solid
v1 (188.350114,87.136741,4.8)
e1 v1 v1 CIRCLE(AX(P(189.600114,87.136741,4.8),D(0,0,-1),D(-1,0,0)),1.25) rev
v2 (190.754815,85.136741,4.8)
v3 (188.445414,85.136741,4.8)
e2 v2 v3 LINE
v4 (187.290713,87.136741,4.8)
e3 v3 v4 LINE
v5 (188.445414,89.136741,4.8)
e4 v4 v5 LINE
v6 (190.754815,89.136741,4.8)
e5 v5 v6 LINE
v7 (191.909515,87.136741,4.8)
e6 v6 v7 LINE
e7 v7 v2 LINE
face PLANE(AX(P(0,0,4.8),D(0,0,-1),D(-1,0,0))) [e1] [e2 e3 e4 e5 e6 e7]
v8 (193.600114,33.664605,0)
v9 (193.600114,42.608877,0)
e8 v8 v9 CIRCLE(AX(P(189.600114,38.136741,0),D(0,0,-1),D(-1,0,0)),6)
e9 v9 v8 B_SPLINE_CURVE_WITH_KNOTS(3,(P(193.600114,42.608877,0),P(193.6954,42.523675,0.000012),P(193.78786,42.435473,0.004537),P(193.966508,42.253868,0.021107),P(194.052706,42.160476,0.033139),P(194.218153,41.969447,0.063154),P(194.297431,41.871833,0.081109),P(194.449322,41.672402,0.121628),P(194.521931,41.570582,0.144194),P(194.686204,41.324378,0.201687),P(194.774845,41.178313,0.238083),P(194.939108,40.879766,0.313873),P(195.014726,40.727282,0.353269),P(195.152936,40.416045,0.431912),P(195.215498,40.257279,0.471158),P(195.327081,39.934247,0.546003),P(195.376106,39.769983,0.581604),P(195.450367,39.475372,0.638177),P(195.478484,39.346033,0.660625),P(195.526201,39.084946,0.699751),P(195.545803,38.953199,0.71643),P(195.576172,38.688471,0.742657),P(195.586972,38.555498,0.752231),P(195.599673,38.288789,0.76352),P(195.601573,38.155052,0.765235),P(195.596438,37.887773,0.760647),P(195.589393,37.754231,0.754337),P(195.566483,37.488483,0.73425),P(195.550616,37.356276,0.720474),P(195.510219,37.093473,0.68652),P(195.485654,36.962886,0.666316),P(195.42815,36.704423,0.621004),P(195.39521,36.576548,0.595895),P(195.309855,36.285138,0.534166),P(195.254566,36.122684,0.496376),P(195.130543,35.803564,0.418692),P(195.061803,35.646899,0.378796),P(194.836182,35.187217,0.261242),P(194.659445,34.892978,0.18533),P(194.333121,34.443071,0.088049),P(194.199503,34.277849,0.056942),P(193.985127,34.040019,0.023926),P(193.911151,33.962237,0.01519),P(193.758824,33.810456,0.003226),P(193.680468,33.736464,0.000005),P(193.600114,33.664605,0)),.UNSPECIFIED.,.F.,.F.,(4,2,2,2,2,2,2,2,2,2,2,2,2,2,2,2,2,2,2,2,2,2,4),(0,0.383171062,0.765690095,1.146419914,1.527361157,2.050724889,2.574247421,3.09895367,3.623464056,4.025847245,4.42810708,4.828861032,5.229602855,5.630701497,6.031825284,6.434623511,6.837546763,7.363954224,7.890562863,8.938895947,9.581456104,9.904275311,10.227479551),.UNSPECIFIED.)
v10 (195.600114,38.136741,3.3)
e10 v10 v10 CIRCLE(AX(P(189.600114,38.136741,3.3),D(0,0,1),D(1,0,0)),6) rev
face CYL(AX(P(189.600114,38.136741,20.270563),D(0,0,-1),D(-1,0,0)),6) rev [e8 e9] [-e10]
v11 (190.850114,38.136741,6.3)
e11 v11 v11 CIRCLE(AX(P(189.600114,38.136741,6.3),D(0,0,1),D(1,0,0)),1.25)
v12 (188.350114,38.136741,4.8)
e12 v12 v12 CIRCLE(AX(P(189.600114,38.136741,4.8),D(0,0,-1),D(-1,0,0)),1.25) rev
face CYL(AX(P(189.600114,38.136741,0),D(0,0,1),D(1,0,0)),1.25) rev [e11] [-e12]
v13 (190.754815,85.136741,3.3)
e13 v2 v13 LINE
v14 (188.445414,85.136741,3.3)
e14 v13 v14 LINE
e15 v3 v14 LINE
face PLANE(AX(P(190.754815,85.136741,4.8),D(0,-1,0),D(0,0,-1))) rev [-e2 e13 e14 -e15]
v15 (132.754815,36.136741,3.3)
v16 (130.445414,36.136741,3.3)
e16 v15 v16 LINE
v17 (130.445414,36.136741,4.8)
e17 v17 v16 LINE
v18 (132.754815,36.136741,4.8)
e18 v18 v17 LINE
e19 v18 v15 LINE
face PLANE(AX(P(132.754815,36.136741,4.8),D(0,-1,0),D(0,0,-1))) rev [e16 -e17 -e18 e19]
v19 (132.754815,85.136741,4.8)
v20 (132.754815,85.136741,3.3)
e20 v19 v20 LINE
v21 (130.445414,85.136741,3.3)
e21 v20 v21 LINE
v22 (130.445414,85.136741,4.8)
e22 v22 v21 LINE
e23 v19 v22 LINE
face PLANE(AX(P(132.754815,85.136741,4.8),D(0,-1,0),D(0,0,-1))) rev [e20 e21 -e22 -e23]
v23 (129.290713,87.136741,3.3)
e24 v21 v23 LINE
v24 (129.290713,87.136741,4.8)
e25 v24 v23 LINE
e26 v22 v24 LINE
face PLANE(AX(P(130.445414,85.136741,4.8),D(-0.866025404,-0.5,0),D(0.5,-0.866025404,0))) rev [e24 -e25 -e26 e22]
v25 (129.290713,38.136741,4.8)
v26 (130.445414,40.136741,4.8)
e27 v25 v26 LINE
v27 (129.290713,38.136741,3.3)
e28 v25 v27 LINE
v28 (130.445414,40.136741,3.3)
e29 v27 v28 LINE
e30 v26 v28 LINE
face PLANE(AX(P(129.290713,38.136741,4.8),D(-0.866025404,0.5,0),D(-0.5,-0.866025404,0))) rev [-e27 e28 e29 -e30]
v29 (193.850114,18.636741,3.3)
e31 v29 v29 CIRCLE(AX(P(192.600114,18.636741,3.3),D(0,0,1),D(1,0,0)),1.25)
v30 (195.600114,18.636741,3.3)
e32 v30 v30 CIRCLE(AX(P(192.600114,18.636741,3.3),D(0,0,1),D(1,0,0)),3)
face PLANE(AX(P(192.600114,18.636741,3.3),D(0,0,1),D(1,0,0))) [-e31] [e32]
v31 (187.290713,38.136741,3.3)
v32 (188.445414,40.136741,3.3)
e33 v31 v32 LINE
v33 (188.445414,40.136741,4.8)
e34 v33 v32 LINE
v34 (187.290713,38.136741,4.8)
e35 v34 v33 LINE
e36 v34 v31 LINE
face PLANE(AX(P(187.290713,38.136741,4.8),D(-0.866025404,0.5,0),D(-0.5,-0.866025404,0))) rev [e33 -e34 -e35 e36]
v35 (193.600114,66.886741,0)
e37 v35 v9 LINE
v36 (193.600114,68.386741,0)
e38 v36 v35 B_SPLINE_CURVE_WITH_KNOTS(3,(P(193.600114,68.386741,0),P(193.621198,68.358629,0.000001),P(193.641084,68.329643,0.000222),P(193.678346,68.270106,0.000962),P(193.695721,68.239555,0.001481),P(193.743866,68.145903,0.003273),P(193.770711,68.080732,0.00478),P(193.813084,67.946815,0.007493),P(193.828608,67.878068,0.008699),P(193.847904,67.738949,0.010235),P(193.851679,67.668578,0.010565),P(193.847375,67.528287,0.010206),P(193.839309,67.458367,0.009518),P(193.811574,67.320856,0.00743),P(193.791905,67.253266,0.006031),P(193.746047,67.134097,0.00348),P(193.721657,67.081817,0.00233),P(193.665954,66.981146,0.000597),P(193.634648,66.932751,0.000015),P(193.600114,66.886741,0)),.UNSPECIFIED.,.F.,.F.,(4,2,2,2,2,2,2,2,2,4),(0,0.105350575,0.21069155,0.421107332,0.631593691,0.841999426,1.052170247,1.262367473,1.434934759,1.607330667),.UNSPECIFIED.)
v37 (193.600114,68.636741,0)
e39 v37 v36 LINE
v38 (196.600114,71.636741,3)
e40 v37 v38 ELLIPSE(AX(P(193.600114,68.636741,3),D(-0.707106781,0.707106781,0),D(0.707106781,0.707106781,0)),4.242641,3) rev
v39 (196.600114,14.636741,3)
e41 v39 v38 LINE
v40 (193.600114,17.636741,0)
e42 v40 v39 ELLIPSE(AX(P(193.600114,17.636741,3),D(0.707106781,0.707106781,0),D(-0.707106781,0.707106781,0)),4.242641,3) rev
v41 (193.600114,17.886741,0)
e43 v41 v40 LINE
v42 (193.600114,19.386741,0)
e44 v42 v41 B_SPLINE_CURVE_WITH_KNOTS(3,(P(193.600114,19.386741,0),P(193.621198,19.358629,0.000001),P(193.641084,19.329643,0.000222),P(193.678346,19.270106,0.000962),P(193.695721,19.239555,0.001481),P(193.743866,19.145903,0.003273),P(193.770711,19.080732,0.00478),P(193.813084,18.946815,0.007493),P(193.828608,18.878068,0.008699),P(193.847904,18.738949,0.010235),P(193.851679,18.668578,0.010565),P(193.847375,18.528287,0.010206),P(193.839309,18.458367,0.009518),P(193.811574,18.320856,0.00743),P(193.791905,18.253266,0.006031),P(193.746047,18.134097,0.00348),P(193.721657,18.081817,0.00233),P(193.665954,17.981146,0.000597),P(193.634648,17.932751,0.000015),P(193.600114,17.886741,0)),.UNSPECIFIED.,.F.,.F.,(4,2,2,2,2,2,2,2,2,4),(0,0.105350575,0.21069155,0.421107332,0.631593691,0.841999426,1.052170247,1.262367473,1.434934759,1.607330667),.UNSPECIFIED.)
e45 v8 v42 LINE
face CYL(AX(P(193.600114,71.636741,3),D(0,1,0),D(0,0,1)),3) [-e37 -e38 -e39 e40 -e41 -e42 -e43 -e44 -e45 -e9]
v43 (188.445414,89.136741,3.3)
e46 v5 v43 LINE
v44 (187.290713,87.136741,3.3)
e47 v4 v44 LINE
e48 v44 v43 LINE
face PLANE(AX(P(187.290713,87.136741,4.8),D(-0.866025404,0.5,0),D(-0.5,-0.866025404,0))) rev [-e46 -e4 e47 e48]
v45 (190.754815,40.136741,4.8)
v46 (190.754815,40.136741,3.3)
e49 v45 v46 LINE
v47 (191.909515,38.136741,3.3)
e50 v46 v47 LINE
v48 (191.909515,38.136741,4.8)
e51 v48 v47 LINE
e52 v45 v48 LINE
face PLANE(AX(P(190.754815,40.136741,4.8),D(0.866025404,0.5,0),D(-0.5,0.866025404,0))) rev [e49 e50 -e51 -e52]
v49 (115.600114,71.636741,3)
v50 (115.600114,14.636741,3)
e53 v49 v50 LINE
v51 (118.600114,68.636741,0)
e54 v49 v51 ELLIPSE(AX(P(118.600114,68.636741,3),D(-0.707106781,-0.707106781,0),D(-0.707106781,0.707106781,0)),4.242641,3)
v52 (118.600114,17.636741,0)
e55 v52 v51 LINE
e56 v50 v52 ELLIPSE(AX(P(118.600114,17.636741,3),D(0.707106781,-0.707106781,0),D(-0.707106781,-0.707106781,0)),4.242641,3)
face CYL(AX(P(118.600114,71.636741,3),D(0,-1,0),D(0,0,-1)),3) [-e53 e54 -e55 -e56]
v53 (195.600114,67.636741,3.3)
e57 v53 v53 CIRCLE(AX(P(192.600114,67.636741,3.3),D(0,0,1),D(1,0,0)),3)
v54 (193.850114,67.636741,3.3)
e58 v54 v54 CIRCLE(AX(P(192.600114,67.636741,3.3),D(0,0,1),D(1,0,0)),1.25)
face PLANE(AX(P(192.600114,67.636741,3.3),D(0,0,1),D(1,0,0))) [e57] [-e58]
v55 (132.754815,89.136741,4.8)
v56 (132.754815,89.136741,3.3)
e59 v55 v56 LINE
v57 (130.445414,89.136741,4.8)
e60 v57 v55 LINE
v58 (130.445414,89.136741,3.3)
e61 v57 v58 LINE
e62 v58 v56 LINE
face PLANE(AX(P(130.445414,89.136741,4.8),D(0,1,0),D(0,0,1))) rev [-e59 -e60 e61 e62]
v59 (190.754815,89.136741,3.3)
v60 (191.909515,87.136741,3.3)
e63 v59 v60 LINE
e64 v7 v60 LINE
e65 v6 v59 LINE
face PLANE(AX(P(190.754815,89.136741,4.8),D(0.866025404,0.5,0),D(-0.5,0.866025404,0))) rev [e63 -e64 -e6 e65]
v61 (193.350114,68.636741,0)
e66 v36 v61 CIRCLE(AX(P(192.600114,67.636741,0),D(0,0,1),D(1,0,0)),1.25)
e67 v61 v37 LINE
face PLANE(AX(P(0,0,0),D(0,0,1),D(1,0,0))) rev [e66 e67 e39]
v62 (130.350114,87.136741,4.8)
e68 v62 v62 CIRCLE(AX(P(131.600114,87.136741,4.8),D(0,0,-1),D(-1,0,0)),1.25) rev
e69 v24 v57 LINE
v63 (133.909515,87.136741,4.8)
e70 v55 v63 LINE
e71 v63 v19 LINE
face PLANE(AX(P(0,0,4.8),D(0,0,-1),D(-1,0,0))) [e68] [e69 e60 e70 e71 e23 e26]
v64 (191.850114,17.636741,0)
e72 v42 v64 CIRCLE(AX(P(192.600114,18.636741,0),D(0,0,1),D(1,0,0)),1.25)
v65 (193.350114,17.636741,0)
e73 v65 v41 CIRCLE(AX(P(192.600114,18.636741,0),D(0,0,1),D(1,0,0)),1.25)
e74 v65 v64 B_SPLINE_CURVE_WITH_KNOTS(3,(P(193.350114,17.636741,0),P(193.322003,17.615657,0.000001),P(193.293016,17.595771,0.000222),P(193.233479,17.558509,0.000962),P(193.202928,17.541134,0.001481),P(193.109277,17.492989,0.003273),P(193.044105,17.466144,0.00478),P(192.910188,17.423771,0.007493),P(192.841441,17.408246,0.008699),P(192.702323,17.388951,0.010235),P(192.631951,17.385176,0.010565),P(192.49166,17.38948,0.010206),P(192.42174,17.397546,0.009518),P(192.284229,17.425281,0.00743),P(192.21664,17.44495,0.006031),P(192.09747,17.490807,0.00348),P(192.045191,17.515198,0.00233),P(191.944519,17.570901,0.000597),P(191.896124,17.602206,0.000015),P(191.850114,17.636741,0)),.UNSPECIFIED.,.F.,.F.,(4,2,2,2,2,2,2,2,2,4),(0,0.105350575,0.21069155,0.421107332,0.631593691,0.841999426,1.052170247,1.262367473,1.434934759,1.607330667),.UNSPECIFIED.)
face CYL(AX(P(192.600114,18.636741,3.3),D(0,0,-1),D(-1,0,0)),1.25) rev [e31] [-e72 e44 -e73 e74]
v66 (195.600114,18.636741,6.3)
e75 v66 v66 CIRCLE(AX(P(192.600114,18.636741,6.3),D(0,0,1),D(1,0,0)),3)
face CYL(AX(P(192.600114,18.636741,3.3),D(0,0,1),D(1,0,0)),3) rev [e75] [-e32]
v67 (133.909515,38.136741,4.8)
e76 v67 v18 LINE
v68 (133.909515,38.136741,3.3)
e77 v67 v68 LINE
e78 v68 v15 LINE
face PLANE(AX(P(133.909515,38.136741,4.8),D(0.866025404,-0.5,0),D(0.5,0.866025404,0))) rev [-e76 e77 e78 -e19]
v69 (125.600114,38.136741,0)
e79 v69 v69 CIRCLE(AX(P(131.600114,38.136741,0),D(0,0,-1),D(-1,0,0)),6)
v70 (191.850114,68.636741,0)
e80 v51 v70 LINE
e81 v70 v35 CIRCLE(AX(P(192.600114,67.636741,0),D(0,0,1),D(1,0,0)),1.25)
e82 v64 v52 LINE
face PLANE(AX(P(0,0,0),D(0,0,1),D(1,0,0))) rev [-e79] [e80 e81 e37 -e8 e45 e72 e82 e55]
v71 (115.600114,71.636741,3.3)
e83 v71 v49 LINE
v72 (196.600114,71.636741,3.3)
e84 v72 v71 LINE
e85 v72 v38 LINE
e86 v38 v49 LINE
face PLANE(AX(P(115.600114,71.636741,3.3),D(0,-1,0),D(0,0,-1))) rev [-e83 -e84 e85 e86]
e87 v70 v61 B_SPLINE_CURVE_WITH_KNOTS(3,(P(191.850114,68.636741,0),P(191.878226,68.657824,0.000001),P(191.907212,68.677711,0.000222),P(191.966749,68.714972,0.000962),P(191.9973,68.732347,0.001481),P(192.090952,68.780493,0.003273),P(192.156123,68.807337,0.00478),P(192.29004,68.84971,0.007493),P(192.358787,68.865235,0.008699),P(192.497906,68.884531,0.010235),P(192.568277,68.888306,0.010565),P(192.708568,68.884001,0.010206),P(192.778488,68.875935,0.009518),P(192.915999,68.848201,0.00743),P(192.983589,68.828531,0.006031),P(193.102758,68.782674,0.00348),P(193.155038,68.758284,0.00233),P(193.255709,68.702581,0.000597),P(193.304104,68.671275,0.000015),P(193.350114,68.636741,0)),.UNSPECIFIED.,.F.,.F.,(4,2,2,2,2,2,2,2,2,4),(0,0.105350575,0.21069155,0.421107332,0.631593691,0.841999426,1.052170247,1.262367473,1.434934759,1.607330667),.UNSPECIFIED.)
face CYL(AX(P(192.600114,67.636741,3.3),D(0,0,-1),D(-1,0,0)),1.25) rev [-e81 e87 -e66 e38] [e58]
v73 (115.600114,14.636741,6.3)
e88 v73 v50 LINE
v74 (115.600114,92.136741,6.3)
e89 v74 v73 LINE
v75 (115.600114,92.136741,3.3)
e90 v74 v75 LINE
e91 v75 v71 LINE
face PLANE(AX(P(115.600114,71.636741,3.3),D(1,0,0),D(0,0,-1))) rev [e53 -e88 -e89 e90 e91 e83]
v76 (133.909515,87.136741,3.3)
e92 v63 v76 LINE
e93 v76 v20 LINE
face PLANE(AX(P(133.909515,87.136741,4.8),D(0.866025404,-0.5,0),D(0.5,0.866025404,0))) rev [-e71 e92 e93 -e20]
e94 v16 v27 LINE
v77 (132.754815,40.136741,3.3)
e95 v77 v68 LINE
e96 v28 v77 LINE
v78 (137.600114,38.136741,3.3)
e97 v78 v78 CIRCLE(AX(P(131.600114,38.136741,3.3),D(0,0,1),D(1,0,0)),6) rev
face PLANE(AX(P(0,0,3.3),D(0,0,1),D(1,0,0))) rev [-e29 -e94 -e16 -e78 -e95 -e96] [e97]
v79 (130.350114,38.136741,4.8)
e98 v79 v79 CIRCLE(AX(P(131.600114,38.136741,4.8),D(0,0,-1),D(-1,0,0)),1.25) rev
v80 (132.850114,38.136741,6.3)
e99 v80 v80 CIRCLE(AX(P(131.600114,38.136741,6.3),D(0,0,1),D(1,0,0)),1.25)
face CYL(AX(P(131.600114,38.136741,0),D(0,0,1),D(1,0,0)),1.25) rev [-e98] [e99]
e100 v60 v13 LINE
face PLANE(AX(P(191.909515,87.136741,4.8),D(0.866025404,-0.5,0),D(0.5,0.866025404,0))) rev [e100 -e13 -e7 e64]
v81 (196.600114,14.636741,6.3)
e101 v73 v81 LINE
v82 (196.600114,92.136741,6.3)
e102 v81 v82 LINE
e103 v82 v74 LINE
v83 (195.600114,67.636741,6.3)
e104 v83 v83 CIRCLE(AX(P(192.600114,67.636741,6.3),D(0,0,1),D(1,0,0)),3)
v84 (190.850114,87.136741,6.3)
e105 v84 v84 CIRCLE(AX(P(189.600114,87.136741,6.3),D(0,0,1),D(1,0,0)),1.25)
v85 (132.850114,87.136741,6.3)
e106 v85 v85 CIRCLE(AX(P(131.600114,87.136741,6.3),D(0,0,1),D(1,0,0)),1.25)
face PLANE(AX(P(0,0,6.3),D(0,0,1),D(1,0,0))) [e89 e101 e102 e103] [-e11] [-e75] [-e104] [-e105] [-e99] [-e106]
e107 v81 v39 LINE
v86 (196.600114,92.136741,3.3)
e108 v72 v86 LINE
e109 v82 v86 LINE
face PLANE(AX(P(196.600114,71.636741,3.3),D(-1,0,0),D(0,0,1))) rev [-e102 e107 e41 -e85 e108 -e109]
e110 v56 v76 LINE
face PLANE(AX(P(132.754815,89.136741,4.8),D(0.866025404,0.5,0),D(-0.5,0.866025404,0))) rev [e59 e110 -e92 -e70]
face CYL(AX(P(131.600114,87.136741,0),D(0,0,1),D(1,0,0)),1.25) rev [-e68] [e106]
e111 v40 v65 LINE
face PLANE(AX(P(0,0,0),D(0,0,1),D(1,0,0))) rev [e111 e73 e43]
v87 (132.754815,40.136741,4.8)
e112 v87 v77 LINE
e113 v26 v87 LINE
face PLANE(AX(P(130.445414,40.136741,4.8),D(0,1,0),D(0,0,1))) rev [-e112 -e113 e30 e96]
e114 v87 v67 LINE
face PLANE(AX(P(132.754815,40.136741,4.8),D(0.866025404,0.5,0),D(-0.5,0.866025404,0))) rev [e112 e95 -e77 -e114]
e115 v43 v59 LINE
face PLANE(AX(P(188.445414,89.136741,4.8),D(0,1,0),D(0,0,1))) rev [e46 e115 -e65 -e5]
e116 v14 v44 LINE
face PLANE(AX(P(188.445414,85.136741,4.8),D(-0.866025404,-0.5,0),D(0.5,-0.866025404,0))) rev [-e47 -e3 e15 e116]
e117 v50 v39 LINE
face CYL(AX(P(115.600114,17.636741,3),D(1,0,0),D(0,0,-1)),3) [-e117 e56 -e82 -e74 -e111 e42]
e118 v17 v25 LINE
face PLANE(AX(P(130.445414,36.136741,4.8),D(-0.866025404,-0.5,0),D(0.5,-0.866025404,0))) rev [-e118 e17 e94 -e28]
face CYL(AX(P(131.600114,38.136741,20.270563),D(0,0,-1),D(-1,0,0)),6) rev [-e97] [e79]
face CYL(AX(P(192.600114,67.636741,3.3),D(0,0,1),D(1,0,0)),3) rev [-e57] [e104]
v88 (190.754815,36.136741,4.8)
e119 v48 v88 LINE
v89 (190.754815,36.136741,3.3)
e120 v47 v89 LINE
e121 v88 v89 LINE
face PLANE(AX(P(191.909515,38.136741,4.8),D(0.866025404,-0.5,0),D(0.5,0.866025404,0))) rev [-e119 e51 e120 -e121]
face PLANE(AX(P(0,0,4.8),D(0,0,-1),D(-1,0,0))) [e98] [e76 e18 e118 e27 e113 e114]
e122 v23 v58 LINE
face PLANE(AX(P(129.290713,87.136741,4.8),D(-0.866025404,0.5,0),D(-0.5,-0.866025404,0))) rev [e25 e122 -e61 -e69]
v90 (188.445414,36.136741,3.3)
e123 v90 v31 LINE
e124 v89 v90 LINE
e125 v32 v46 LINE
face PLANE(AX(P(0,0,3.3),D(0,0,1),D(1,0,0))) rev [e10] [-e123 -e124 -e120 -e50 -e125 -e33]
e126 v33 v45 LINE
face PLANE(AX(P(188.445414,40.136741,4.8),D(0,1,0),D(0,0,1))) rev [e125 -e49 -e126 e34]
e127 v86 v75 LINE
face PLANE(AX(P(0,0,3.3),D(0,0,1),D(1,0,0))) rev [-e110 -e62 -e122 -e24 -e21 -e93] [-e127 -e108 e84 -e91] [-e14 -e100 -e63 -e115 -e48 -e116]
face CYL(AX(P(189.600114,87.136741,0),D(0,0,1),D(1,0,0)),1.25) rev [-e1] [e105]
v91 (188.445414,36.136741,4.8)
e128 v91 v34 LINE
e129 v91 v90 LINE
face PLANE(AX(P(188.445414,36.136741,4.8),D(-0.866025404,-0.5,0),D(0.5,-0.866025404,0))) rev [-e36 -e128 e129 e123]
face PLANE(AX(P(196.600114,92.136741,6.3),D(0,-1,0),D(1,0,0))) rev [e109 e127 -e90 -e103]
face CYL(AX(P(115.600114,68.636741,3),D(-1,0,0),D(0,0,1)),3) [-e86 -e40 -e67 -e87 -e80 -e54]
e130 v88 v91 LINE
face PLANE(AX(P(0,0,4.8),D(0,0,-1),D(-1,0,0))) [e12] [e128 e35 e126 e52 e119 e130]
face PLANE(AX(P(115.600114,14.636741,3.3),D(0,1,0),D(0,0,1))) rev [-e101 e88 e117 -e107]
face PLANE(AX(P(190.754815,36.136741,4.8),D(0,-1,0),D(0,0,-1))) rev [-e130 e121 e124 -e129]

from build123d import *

# Parameters (mm, degrees)
SKETCH1_W           = 81
SKETCH1_H           = 57
SKETCH1_R           = 1.25
BOSS_EXTRUDE1_DEPTH = 3.3
SKETCH2_W           = 81
SKETCH2_H           = 77.5
SKETCH2_R           = 1.25
BOSS_EXTRUDE2_DEPTH = 3
CUT_EXTRUDE1_DEPTH  = 218.210667029
SKETCH4_R           = 6
CUT_EXTRUDE2_DEPTH  = 3.3
CUT_EXTRUDE3_DEPTH  = 1.5
SKETCH6_R           = 3
CUT_EXTRUDE4_DEPTH  = 3
FILLET1_R           = 3


with BuildPart() as part:
    # Sketch1 → Boss-Extrude1 (new body)
    with BuildSketch(Plane.XY):
        with Locations((156.100114143, 43.136740717)):
            Rectangle(SKETCH1_W, SKETCH1_H)
        with Locations((192.600114143, 18.636740717)):
            Circle(SKETCH1_R, mode=Mode.SUBTRACT)
        with Locations((192.600114143, 67.636740717)):
            Circle(SKETCH1_R, mode=Mode.SUBTRACT)
    extrude(amount=BOSS_EXTRUDE1_DEPTH)

    # Sketch2 → Boss-Extrude2 (add)
    with BuildSketch(Plane.XY.offset(3.3)):
        with Locations((156.100114143, 53.386740717)):
            Rectangle(SKETCH2_W, SKETCH2_H)
        with Locations((192.600114143, 67.636740717)):
            Circle(SKETCH2_R, mode=Mode.SUBTRACT)
        with Locations((192.600114143, 18.636740717)):
            Circle(SKETCH2_R, mode=Mode.SUBTRACT)
    extrude(amount=BOSS_EXTRUDE2_DEPTH)

    # Sketch3 → Cut-Extrude1 (cut, through all)
    with BuildSketch(Plane.XY.offset(6.3)):
        with BuildLine():
            Line((131.600114143, 85.886740717), (131.600114143, 87.136740717))
            Line((131.600114143, 87.136740717), (132.850114143, 87.136740717))
            ThreePointArc((132.850114143, 87.136740717), (130.716230667, 88.020624193), (131.600114143, 85.886740717))
        make_face()
        with BuildLine():
            Line((132.850114143, 87.136740717), (131.600114143, 87.136740717))
            Line((131.600114143, 87.136740717), (131.600114143, 85.886740717))
            ThreePointArc((131.600114143, 85.886740717), (132.48399762, 86.25285724), (132.850114143, 87.136740717))
        make_face()
        with BuildLine():
            ThreePointArc((190.850114143, 87.136740717), (189.600114143, 88.386740717), (188.350114143, 87.136740717))
            Line((188.350114143, 87.136740717), (189.600114143, 87.136740717))
            Line((189.600114143, 87.136740717), (189.600114143, 85.886740717))
            ThreePointArc((189.600114143, 85.886740717), (190.48399762, 86.25285724), (190.850114143, 87.136740717))
        make_face()
        with BuildLine():
            Line((189.600114143, 87.136740717), (188.350114143, 87.136740717))
            ThreePointArc((188.350114143, 87.136740717), (188.716230667, 86.25285724), (189.600114143, 85.886740717))
            Line((189.600114143, 85.886740717), (189.600114143, 87.136740717))
        make_face()
        with BuildLine():
            ThreePointArc((190.850114143, 38.136740717), (190.48399762, 39.020624193), (189.600114143, 39.386740717))
            Line((189.600114143, 39.386740717), (189.600114143, 38.136740717))
            Line((189.600114143, 38.136740717), (188.350114143, 38.136740717))
            ThreePointArc((188.350114143, 38.136740717), (189.600114143, 36.886740717), (190.850114143, 38.136740717))
        make_face()
        with BuildLine():
            Line((189.600114143, 38.136740717), (189.600114143, 39.386740717))
            ThreePointArc((189.600114143, 39.386740717), (188.716230667, 39.020624193), (188.350114143, 38.136740717))
            Line((188.350114143, 38.136740717), (189.600114143, 38.136740717))
        make_face()
        with BuildLine():
            ThreePointArc((132.850114143, 38.136740717), (132.48399762, 39.020624193), (131.600114143, 39.386740717))
            Line((131.600114143, 39.386740717), (131.600114143, 38.136740717))
            Line((131.600114143, 38.136740717), (132.850114143, 38.136740717))
        make_face()
        with BuildLine():
            Line((131.600114143, 38.136740717), (131.600114143, 39.386740717))
            ThreePointArc((131.600114143, 39.386740717), (130.716230667, 37.25285724), (132.850114143, 38.136740717))
            Line((132.850114143, 38.136740717), (131.600114143, 38.136740717))
        make_face()
    extrude(amount=-CUT_EXTRUDE1_DEPTH, mode=Mode.SUBTRACT)

    # Sketch4 → Cut-Extrude2 (cut)
    with BuildSketch(Plane(origin=(0, 0, 0), x_dir=(-1, 0, 0), z_dir=(0, 0, -1))):
        with Locations((-189.600114143, 38.136740717)):
            Circle(SKETCH4_R)
        with Locations((-131.600114143, 38.136740717)):
            Circle(SKETCH4_R)
    extrude(amount=-CUT_EXTRUDE2_DEPTH, mode=Mode.SUBTRACT)

    # Sketch5 → Cut-Extrude3 (cut)
    with BuildSketch(Plane(origin=(0, 0, 3.3), x_dir=(-1, 0, 0), z_dir=(0, 0, -1))):
        Polygon((-187.290713067, 87.136740717), (-188.445413605, 89.136740717), (-190.754814682, 89.136740717), (-191.90951522, 87.136740717), (-190.754814682, 85.136740717), (-188.445413605, 85.136740717), align=None)
        Polygon((-129.290713067, 87.136740717), (-130.445413605, 89.136740717), (-132.754814682, 89.136740717), (-133.90951522, 87.136740717), (-132.754814682, 85.136740717), (-130.445413605, 85.136740717), align=None)
        Polygon((-130.445413605, 40.136740717), (-132.754814682, 40.136740717), (-133.90951522, 38.136740717), (-132.754814682, 36.136740717), (-130.445413605, 36.136740717), (-129.290713067, 38.136740717), align=None)
        Polygon((-187.290713067, 38.136740717), (-188.445413605, 40.136740717), (-190.754814682, 40.136740717), (-191.90951522, 38.136740717), (-190.754814682, 36.136740717), (-188.445413605, 36.136740717), align=None)
    extrude(amount=-CUT_EXTRUDE3_DEPTH, mode=Mode.SUBTRACT)

    # Sketch6 → Cut-Extrude4 (cut)
    with BuildSketch(Plane.XY.offset(6.3)):
        with Locations((192.600114143, 67.636740717)):
            Circle(SKETCH6_R)
        with Locations((192.600114143, 18.636740717)):
            Circle(SKETCH6_R)
    extrude(amount=-CUT_EXTRUDE4_DEPTH, mode=Mode.SUBTRACT)

    # Fillet1
    # the kernel refuses this fillet: 3 mm, written as the material it takes off along each edge
    with BuildSketch(Plane(origin=(108.100114143, 71.636740717, 0), x_dir=(0, 0, 1), z_dir=(1, 0, 0))) as fillet1_piece_1:
        with BuildLine():
            CenterArc((FILLET1_R, FILLET1_R), FILLET1_R, 180, 90)
            Line((0, FILLET1_R), (0, 0))
            Line((0, 0), (FILLET1_R, 0))
        make_face()
    extrude(amount=96, mode=Mode.SUBTRACT)
    with BuildSketch(Plane(origin=(196.600114143, 79.136740717, 0), x_dir=(0, 0, 1), z_dir=(0, -1, 0)), Plane(origin=(115.600114143, 7.136740717, 0), x_dir=(0, 0, 1), z_dir=(0, 1, 0))) as fillet1_piece_2:
        with BuildLine():
            CenterArc((FILLET1_R, FILLET1_R), FILLET1_R, 180, 90)
            Line((0, FILLET1_R), (0, 0))
            Line((0, 0), (FILLET1_R, 0))
        make_face()
    extrude(amount=72, mode=Mode.SUBTRACT)
    with BuildSketch(Plane(origin=(204.100114143, 14.636740717, 0), x_dir=(0, 1, 0), z_dir=(-1, 0, 0))) as fillet1_piece_3:
        with BuildLine():
            CenterArc((FILLET1_R, -FILLET1_R), FILLET1_R, 90, 90)
            Line((0, -FILLET1_R), (0, 0))
            Line((0, 0), (FILLET1_R, 0))
        make_face()
    extrude(amount=96, mode=Mode.SUBTRACT)


solid = part.part
